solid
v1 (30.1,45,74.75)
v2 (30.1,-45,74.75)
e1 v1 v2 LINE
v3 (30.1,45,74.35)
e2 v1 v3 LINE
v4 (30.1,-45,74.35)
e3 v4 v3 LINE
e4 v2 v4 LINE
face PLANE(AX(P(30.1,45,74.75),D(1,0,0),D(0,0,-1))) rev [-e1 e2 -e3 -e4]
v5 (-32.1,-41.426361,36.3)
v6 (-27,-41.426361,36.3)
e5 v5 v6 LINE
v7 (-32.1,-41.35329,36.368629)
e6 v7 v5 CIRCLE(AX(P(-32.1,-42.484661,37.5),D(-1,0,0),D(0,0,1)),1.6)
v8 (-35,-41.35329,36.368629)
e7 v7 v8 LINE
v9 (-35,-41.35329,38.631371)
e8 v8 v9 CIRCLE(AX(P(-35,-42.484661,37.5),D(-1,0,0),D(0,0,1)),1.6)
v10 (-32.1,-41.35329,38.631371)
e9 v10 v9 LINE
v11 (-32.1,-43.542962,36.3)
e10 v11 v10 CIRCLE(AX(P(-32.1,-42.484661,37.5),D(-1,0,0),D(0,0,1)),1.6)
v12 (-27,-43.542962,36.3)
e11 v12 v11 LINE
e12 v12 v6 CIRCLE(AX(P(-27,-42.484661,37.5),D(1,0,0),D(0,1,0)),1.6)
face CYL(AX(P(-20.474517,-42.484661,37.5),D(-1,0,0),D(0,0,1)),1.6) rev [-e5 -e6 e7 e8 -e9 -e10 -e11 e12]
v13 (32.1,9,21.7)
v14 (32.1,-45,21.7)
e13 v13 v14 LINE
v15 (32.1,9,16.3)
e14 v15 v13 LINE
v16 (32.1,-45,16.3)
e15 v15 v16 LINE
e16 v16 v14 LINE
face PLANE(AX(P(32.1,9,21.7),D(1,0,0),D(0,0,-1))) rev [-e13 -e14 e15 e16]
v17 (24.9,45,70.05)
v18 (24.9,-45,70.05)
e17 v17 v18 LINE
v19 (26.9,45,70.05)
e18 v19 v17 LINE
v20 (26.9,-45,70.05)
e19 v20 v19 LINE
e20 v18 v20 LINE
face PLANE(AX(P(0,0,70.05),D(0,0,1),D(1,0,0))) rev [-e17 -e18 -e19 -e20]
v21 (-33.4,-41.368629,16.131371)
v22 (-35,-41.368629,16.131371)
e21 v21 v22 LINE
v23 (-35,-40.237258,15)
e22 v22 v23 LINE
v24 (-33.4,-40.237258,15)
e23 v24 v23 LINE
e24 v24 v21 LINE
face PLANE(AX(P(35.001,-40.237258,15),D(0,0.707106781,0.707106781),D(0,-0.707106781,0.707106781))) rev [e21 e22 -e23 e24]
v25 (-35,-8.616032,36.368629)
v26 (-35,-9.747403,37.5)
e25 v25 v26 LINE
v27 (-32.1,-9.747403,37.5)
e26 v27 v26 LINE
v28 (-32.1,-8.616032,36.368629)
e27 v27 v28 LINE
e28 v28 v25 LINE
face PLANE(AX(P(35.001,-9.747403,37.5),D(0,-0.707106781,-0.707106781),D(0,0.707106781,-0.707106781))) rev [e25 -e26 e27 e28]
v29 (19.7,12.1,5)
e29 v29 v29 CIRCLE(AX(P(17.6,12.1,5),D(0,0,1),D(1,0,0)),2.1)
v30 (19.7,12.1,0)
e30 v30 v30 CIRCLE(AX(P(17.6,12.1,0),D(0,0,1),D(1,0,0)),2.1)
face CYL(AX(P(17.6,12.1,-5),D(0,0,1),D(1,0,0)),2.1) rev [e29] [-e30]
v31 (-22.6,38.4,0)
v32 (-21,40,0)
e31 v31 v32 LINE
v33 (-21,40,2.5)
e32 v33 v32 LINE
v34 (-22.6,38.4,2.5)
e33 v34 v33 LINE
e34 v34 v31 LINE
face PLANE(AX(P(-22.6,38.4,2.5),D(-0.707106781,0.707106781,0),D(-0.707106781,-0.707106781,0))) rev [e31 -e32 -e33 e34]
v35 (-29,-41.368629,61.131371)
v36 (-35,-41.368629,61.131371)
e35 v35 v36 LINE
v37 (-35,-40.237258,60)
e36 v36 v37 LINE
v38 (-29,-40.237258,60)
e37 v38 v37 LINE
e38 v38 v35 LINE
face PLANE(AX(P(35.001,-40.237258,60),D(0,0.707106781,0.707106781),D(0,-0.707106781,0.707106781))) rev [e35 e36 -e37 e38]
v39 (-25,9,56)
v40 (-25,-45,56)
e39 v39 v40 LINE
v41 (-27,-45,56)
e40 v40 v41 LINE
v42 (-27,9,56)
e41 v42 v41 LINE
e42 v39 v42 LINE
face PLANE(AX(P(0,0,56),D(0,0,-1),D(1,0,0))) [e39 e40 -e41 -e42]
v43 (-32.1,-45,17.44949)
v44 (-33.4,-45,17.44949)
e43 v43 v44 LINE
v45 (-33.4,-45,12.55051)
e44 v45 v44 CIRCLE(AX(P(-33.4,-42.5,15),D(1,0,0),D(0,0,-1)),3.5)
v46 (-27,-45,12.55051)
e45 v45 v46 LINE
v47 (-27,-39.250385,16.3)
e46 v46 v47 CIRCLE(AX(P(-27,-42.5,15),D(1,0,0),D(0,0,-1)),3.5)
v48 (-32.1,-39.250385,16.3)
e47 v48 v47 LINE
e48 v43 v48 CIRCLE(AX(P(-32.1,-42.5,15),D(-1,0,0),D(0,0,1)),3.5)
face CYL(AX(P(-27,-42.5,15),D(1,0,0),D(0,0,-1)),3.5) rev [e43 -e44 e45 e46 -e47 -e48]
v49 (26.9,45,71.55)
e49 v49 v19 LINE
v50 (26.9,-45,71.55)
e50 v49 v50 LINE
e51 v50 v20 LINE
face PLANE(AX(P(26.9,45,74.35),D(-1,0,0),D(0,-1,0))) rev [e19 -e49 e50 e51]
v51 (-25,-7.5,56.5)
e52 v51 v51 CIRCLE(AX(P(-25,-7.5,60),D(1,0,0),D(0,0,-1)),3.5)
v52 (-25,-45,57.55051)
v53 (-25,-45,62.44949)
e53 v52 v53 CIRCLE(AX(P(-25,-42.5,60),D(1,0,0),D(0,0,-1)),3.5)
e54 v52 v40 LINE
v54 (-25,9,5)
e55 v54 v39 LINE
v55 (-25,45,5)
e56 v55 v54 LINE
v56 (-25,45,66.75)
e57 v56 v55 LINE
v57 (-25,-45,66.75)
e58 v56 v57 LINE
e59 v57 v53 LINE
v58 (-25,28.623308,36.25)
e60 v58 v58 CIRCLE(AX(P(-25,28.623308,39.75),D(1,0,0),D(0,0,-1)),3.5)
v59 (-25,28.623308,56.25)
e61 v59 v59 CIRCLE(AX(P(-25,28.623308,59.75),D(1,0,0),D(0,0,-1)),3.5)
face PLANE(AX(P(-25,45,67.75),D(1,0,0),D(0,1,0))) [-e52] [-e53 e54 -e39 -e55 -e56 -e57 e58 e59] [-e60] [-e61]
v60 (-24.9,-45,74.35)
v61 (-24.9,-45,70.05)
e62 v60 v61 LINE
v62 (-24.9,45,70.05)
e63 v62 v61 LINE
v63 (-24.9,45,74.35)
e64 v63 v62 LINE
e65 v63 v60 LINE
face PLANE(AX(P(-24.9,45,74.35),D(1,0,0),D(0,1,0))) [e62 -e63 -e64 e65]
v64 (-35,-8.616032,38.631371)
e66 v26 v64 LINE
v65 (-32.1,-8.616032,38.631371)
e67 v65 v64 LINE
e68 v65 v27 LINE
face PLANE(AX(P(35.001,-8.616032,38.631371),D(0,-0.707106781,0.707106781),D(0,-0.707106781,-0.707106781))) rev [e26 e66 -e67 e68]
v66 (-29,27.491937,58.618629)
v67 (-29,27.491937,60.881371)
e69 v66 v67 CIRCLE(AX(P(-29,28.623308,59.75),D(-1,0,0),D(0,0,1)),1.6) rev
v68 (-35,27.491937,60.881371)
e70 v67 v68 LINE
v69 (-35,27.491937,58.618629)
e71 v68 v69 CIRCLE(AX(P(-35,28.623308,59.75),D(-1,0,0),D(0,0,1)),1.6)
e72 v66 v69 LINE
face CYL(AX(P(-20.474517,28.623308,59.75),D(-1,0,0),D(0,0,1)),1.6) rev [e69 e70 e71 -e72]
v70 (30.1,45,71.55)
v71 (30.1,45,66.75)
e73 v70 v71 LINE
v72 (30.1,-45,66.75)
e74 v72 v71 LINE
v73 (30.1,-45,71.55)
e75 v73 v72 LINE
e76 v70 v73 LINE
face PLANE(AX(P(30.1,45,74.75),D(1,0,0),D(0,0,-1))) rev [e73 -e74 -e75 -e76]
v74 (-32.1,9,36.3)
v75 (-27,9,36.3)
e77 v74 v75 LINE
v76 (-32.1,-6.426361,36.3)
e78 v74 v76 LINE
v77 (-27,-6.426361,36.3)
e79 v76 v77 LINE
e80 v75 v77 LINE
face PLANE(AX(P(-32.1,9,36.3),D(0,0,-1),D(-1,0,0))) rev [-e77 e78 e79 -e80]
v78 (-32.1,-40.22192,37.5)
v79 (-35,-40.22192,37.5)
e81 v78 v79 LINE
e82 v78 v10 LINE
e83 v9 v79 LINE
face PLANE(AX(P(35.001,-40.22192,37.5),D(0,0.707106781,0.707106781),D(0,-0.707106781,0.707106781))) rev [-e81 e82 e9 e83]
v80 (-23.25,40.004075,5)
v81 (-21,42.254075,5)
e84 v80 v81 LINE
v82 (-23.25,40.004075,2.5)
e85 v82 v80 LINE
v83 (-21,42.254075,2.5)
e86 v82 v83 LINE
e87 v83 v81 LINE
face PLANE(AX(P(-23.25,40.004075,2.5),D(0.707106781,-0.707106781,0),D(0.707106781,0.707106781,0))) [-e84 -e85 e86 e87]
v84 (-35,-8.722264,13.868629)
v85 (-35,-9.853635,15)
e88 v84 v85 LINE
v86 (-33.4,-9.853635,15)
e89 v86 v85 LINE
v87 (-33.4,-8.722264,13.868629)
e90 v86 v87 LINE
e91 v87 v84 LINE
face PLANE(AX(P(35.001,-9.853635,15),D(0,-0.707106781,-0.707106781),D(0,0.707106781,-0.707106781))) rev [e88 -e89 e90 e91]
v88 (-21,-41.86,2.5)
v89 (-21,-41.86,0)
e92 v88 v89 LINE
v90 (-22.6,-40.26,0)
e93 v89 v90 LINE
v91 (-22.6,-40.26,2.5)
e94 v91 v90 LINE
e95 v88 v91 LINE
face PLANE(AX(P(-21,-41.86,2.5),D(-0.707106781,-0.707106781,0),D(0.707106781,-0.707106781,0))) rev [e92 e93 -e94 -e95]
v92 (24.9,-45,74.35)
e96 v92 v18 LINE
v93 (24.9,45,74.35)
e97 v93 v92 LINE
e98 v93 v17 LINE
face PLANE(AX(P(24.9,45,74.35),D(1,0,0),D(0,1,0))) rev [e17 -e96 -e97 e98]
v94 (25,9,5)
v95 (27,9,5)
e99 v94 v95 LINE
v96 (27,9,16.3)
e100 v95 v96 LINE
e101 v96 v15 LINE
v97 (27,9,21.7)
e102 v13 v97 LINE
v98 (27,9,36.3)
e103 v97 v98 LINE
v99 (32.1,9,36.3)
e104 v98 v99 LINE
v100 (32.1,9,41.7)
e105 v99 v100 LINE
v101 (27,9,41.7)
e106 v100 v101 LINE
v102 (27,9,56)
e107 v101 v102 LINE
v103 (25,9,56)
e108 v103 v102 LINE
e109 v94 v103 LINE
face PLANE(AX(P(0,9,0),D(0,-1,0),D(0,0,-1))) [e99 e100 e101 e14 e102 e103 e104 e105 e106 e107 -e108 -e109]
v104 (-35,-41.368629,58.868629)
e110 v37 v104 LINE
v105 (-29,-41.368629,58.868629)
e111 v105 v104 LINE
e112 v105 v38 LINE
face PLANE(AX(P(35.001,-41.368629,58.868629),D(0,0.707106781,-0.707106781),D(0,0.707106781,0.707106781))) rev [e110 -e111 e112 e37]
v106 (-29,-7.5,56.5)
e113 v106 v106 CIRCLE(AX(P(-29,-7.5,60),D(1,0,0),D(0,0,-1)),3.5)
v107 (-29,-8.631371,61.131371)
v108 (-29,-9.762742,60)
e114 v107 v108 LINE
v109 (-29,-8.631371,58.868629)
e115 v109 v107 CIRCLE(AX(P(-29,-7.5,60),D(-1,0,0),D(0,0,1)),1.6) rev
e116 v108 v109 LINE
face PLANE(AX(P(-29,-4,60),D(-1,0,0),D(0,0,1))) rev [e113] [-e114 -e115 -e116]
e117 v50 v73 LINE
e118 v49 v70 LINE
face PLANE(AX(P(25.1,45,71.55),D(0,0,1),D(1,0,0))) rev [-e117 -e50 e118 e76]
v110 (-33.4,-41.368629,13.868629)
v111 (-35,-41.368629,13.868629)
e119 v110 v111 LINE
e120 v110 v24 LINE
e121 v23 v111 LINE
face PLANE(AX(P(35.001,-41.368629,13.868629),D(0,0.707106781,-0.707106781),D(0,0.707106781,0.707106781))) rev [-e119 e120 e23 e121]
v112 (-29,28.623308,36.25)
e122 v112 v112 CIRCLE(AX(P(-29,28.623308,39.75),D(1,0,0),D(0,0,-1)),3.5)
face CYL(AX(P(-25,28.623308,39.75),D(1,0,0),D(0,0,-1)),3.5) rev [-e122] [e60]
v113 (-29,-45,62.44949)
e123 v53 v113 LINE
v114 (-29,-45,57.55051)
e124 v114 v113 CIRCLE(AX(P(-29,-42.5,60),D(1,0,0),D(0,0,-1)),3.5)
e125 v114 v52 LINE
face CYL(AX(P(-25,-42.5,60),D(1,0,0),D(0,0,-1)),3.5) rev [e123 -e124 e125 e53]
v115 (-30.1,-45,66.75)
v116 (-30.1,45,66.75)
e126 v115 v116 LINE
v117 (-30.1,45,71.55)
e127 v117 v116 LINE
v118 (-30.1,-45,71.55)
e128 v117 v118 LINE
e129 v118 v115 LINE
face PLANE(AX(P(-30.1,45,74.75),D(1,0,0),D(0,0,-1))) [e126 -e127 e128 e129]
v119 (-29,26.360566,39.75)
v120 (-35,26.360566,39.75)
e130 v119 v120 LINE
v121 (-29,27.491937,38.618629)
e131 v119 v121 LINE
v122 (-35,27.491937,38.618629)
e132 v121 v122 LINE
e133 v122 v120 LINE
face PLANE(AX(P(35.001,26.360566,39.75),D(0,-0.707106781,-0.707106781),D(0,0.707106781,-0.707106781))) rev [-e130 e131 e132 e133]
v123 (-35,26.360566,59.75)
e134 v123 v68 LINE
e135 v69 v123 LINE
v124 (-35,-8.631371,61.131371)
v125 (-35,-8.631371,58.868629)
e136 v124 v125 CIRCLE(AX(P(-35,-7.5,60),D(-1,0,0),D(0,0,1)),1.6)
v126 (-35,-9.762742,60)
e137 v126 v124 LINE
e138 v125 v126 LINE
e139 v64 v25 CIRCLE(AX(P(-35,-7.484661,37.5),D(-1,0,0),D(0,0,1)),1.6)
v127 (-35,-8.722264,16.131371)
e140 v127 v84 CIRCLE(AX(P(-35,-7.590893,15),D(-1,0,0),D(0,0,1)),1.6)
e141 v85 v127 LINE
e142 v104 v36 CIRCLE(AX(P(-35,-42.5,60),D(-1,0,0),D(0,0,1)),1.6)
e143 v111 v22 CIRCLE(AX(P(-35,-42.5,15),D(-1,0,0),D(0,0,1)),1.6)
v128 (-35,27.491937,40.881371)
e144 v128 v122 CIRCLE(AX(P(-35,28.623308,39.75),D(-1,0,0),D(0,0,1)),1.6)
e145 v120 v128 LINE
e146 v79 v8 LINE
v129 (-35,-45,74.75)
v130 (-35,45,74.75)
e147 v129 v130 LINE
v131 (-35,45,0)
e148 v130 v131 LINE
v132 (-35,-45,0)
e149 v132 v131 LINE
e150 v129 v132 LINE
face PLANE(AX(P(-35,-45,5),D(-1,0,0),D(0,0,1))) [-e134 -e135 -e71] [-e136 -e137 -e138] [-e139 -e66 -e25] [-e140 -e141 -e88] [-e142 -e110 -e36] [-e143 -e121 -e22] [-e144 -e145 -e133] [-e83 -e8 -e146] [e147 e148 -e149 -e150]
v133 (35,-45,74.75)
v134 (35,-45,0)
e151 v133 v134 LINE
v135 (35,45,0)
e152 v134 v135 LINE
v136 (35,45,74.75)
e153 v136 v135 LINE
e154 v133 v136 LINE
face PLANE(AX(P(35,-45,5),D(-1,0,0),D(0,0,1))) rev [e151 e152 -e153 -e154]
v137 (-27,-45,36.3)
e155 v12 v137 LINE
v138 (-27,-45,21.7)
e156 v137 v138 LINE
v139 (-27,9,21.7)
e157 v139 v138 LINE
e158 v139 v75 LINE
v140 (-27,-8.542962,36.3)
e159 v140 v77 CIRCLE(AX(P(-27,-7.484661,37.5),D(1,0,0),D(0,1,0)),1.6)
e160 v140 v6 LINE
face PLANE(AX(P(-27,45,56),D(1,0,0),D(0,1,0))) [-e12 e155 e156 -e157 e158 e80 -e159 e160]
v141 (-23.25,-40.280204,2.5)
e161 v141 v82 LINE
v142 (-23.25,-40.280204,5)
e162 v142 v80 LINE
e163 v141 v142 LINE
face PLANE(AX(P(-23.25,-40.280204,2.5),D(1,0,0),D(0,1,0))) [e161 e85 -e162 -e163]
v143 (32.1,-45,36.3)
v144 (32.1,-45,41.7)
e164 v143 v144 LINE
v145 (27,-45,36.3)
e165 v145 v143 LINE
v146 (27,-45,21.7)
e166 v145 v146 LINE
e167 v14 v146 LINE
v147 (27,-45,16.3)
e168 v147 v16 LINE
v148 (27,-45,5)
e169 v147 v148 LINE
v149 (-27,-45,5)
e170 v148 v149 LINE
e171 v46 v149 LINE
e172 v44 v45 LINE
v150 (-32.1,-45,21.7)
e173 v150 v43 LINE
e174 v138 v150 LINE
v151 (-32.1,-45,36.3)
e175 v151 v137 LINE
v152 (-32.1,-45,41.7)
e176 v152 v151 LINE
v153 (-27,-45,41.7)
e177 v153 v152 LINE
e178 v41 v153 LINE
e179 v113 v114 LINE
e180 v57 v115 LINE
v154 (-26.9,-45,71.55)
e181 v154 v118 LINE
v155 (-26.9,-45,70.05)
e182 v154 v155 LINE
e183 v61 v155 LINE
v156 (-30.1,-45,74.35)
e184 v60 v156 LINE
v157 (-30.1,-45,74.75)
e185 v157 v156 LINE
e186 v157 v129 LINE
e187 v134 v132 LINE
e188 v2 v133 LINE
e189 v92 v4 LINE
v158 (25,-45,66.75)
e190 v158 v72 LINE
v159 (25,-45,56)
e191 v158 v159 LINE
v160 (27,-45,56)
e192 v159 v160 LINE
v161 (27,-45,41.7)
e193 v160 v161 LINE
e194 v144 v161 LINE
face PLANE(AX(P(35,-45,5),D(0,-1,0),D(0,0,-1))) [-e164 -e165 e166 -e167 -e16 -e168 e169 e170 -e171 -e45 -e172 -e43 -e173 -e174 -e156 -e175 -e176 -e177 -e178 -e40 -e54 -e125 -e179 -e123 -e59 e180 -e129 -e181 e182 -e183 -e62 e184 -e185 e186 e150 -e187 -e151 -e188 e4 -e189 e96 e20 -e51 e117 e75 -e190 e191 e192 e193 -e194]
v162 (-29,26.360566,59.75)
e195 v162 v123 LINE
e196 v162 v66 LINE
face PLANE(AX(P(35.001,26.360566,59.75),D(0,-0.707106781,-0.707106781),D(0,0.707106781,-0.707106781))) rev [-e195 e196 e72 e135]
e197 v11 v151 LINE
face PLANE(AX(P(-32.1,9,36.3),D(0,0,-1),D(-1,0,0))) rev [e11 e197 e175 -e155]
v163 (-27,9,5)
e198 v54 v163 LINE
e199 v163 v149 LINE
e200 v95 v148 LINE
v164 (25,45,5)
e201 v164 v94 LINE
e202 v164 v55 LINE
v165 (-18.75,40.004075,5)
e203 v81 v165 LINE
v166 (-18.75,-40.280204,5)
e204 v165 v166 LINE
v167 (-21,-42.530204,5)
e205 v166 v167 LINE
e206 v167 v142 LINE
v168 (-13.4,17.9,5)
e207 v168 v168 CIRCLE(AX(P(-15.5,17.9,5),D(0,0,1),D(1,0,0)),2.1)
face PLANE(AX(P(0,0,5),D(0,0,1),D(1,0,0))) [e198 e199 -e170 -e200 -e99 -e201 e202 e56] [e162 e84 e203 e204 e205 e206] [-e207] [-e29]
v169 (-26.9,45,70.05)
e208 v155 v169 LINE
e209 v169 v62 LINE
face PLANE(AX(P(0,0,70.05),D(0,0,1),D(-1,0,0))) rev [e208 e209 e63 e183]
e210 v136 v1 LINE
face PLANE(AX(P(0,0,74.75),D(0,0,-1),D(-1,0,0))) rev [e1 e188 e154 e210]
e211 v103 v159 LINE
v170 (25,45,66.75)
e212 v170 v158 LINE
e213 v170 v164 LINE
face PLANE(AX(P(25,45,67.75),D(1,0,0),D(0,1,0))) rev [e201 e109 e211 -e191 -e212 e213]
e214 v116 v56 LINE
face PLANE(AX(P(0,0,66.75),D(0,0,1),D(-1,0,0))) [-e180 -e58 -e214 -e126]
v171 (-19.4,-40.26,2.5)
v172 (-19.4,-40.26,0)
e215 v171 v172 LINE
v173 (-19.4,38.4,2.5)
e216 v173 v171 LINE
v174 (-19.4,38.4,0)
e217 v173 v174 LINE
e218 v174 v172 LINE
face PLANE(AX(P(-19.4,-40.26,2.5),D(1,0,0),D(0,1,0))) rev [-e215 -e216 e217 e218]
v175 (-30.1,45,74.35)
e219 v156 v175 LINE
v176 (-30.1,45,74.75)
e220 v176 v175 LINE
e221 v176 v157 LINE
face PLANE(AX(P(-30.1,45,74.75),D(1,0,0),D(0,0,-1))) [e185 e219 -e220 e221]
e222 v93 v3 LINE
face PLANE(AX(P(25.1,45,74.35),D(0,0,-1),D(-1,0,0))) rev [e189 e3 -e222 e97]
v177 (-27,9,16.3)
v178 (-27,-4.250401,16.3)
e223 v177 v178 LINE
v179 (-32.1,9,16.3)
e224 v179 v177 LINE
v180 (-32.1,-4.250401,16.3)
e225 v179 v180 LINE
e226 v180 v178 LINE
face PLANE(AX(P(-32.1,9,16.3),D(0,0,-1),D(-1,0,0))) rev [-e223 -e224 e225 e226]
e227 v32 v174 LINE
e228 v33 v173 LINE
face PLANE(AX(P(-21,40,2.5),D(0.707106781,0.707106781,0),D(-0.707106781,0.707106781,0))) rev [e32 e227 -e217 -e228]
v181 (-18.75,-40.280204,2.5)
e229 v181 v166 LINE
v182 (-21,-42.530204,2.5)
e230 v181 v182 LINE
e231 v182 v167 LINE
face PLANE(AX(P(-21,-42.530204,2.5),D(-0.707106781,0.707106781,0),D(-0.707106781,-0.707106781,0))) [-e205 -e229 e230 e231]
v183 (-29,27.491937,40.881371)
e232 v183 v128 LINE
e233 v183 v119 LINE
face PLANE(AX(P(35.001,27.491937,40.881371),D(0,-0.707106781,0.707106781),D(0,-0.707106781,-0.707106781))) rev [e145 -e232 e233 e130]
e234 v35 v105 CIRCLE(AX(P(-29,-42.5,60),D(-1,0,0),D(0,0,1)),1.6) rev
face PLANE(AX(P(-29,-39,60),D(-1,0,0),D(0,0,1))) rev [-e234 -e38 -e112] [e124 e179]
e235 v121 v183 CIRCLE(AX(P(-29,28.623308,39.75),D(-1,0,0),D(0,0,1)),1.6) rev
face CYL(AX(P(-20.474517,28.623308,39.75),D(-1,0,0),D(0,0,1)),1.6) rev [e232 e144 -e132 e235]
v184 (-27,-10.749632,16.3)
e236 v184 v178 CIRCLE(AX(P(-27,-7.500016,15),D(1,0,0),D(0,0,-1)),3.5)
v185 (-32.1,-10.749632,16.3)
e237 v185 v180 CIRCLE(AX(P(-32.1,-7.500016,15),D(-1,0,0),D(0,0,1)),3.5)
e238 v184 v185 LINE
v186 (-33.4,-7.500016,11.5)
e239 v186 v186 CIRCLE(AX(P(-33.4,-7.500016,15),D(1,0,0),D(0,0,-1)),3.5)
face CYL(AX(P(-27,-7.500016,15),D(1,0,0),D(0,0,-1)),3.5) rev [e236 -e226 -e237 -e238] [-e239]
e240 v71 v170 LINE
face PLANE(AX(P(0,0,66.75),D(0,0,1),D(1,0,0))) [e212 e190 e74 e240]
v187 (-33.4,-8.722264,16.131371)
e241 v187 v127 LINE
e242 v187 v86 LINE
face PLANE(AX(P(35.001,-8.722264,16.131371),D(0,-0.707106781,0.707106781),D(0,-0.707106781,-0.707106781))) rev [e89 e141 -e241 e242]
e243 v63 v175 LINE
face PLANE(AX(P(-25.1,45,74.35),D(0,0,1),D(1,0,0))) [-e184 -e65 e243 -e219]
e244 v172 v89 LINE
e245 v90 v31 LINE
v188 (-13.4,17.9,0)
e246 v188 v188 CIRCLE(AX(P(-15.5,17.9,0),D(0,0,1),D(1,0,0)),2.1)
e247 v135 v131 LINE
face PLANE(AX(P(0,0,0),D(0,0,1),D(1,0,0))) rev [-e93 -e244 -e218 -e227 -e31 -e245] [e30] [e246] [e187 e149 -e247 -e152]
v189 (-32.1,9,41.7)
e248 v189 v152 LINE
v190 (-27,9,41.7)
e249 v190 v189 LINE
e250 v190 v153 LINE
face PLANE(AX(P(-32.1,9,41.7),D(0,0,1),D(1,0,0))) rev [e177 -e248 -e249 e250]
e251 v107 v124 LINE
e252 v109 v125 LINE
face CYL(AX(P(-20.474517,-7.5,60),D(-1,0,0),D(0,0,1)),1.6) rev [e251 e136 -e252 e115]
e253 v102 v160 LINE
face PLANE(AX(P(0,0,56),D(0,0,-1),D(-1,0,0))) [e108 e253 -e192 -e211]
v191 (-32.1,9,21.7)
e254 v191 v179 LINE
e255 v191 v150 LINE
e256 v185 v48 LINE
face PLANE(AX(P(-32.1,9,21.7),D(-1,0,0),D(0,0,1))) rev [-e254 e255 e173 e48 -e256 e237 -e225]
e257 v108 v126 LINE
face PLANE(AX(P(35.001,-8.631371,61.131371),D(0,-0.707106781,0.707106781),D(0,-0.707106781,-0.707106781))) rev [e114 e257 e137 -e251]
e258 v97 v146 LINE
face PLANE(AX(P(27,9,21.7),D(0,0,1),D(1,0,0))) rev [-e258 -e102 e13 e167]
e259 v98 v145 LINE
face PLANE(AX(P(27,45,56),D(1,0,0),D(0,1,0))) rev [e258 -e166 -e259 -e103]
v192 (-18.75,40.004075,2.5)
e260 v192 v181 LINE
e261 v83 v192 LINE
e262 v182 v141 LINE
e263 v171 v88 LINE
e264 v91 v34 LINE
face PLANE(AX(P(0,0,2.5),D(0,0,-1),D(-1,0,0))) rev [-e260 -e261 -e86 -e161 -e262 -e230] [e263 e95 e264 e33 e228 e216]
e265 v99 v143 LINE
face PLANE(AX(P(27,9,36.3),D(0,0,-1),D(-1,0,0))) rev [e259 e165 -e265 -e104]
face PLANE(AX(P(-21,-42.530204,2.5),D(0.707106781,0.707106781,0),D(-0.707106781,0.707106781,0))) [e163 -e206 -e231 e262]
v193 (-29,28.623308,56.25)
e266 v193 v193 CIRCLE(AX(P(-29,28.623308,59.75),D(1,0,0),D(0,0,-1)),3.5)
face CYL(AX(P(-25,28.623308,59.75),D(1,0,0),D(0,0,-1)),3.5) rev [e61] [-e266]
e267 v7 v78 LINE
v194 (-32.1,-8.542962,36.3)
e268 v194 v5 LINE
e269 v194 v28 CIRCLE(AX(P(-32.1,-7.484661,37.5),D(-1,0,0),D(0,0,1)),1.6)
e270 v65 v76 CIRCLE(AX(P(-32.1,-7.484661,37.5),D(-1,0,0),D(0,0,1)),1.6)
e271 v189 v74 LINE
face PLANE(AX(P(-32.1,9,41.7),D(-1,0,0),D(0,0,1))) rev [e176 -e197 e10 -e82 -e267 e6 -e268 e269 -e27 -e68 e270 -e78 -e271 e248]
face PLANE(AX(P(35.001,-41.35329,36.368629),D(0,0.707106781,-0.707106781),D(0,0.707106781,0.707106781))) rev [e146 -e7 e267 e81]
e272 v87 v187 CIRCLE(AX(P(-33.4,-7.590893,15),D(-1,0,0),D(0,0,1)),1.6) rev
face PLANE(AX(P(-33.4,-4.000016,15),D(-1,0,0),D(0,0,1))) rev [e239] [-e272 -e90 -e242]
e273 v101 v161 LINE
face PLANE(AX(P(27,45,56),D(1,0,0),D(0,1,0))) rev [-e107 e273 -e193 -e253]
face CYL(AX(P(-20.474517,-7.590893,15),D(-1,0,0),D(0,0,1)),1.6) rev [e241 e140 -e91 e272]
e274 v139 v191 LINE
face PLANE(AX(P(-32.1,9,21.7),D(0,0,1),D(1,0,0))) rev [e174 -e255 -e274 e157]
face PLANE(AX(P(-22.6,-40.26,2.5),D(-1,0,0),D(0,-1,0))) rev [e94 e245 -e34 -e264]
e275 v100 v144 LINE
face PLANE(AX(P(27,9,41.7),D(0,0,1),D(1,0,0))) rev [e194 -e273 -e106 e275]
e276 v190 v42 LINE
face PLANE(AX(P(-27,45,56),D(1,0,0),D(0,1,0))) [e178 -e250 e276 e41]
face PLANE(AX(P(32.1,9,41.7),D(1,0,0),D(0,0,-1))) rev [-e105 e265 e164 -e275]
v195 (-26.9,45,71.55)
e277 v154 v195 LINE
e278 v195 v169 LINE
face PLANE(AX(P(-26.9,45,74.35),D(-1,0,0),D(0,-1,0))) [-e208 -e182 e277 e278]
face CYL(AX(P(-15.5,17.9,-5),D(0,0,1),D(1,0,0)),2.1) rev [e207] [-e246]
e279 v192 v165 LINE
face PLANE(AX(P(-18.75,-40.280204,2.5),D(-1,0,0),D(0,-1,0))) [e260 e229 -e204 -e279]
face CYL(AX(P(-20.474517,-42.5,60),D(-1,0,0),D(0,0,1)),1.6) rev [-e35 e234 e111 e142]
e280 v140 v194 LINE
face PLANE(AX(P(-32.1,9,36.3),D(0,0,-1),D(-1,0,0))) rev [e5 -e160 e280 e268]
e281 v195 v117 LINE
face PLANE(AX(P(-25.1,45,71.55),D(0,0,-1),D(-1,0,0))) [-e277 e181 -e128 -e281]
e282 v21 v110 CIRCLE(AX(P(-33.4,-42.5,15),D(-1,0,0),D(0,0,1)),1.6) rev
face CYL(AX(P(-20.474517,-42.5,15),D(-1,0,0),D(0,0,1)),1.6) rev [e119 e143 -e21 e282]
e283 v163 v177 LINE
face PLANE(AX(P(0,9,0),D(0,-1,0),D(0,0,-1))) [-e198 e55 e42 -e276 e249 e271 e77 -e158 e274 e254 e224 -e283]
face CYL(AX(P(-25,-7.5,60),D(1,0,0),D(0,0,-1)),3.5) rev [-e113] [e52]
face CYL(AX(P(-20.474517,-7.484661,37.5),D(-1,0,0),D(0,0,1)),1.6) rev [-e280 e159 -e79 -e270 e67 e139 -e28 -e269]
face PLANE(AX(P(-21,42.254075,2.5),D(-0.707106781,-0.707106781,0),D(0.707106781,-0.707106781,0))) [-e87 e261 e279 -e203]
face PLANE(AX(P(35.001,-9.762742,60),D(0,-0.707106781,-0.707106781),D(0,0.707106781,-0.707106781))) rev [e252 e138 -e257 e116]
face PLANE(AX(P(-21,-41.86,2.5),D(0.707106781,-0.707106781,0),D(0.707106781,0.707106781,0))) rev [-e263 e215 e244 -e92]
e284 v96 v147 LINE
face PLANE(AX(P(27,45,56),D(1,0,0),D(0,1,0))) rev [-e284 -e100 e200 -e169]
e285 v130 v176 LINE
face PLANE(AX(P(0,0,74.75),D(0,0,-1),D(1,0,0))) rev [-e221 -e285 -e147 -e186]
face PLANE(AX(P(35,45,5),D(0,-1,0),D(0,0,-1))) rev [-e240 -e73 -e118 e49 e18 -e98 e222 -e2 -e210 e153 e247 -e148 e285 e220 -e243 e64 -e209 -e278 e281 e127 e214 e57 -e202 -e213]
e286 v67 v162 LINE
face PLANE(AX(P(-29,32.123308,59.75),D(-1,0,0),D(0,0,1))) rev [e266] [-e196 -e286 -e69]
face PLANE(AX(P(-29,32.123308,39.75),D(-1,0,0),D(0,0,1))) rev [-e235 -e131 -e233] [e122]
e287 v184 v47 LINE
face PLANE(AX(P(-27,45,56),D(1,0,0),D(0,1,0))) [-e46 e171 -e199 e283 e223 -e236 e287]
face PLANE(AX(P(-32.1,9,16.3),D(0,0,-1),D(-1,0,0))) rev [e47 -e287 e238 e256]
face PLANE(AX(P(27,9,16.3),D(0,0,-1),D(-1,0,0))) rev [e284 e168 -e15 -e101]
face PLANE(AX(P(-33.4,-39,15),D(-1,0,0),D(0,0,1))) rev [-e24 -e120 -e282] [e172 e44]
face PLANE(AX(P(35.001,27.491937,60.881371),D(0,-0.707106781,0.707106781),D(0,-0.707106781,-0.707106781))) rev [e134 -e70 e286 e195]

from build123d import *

# Parameters (mm, degrees)
SKETCH1_W                 = 90
SKETCH1_H                 = 70
BOSS_EXTRUDE1_DEPTH       = 5
SKETCH2_W                 = 8
SKETCH2_H                 = 90
BOSS_EXTRUDE2_DEPTH       = 51
SKETCH3_W                 = 5.1
SKETCH3_H                 = 5.4
CUT_EXTRUDE1_DEPTH        = 54
SKETCH14_W                = 10
SKETCH14_H                = 90
BOSS_EXTRUDE6_DEPTH       = 11.75
SKETCH15_W                = 4.9
SKETCH15_H                = 90
BOSS_EXTRUDE7_DEPTH       = 7
SKETCH17_W                = 90
SKETCH17_H                = 2.8
BOSS_EXTRUDE8_DEPTH       = 5
SKETCH16_W                = 5.1
SKETCH16_H                = 90
CUT_EXTRUDE3_DEPTH        = 1
BOSS_EXTRUDE9_START       = -1.5
SKETCH18_W                = 2
SKETCH18_H                = 90
BOSS_EXTRUDE9_DEPTH       = 4.3
SKETCH43_W                = 36
SKETCH43_H                = 51
BOSS_EXTRUDE10_DEPTH      = 2
CUT_EXTRUDE4_START        = -10
SKETCH44_R                = 1.6
CUT_EXTRUDE4_DEPTH        = 10
SKETCH45_R                = 1.6
CUT_EXTRUDE5_DEPTH        = 95.008310803
CUT_EXTRUDE6_DEPTH        = 2.5
CUT_EXTRUDE7_DEPTH        = 2.5
ADVANCEDHOLE4_START       = -33.4
ADVANCEDHOLE4_OUTLINE_R   = 1.6
ADVANCEDHOLE4_OUTLINE_R_2 = 3.5
ADVANCEDHOLE4_DEPTH       = 6.4
ADVANCEDHOLE5_START       = -29
ADVANCEDHOLE5_OUTLINE_R   = 1.6
ADVANCEDHOLE5_OUTLINE_R_2 = 3.5
ADVANCEDHOLE5_DEPTH       = 4
CUT_EXTRUDE8_REACH        = 113.86
SKETCH65_R                = 2.1
CUT_EXTRUDE9_DEPTH        = 10


# Read off the part's stored shape, not the designer's step: AdvancedHole4, AdvancedHole5
with BuildPart() as part:
    # Sketch1 → Boss-Extrude1 (new body)
    with BuildSketch(Plane(origin=(0, 0, 0), x_dir=(0, 1, 0), z_dir=(0, 0, 1))):
        Rectangle(SKETCH1_W, SKETCH1_H)
    extrude(amount=BOSS_EXTRUDE1_DEPTH)

    # Sketch2 → Boss-Extrude2 (add)
    with BuildSketch(Plane.XY.offset(5)):
        with Locations((-31, 0)):
            Rectangle(SKETCH2_W, SKETCH2_H)
        with Locations((31, 0)):
            Rectangle(SKETCH2_W, SKETCH2_H)
    extrude(amount=BOSS_EXTRUDE2_DEPTH)

    # Sketch3 → Cut-Extrude1 (cut)
    with BuildSketch(Plane.XZ.offset(45)):
        with Locations((-29.55, 19)):
            Rectangle(SKETCH3_W, SKETCH3_H)
        with Locations((-29.55, 39)):
            Rectangle(SKETCH3_W, SKETCH3_H)
        with Locations((29.55, 19)):
            Rectangle(SKETCH3_W, SKETCH3_H)
        with Locations((29.55, 39)):
            Rectangle(SKETCH3_W, SKETCH3_H)
    extrude(amount=-CUT_EXTRUDE1_DEPTH, mode=Mode.SUBTRACT)

    # Sketch14 → Boss-Extrude6 (add)
    with BuildSketch(Plane.XY.offset(56)):
        with Locations((30, 0)):
            Rectangle(SKETCH14_W, SKETCH14_H)
    boss_extrude6 = extrude(amount=BOSS_EXTRUDE6_DEPTH)

    # Sketch15 → Boss-Extrude7 (add)
    with BuildSketch(Plane.XY.offset(67.75)):
        with Locations((32.55, 0)):
            Rectangle(SKETCH15_W, SKETCH15_H)
    boss_extrude7 = extrude(amount=BOSS_EXTRUDE7_DEPTH)

    # Sketch17 → Boss-Extrude8 (add)
    with BuildSketch(Plane(origin=(30.1, 0, 0), x_dir=(0, -1, 0), z_dir=(-1, 0, 0))):
        with Locations((0, 72.95)):
            Rectangle(SKETCH17_W, SKETCH17_H)
    boss_extrude8 = extrude(amount=BOSS_EXTRUDE8_DEPTH)

    # Sketch16 → Cut-Extrude3 (cut)
    with BuildSketch(Plane.XY.offset(67.75)):
        with Locations((27.55, 0)):
            Rectangle(SKETCH16_W, SKETCH16_H)
    cut_extrude3 = extrude(amount=-CUT_EXTRUDE3_DEPTH, mode=Mode.SUBTRACT)

    # Sketch18 → Boss-Extrude9 (add)
    with BuildSketch(Plane.XY.offset(71.55).offset(BOSS_EXTRUDE9_START)):
        with Locations((25.9, 0)):
            Rectangle(SKETCH18_W, SKETCH18_H)
    boss_extrude9 = extrude(amount=BOSS_EXTRUDE9_DEPTH)

    # Sketch43 → Boss-Extrude10 (add)
    with BuildSketch(Plane(origin=(27, 0, 0), x_dir=(0, -1, 0), z_dir=(-1, 0, 0))):
        with Locations((-27, 30.5)):
            Rectangle(SKETCH43_W, SKETCH43_H)
    boss_extrude10 = extrude(amount=BOSS_EXTRUDE10_DEPTH)

    # Mirror2: Boss-Extrude6, Boss-Extrude7, Boss-Extrude8, Cut-Extrude3, Boss-Extrude9, Boss-Extrude10 across plane
    add(boss_extrude6.mirror(Plane(origin=(0, 0, 0), x_dir=(0, 0, 1), z_dir=(1, 0, 0))))
    add(boss_extrude7.mirror(Plane(origin=(0, 0, 0), x_dir=(0, 0, 1), z_dir=(1, 0, 0))))
    add(boss_extrude8.mirror(Plane(origin=(0, 0, 0), x_dir=(0, 0, 1), z_dir=(1, 0, 0))))
    add(cut_extrude3.mirror(Plane(origin=(0, 0, 0), x_dir=(0, 0, 1), z_dir=(1, 0, 0))), mode=Mode.SUBTRACT)
    add(boss_extrude9.mirror(Plane(origin=(0, 0, 0), x_dir=(0, 0, 1), z_dir=(1, 0, 0))))
    add(boss_extrude10.mirror(Plane(origin=(0, 0, 0), x_dir=(0, 0, 1), z_dir=(1, 0, 0))))

    # Sketch44 → Cut-Extrude4 (cut)
    with BuildSketch(Plane(origin=(-35, 0, 0), x_dir=(0, -1, 0), z_dir=(-1, 0, 0)).offset(CUT_EXTRUDE4_START)):
        with Locations(Location((42.5, 15, 0), (0, 0, 90))):
            Circle(SKETCH44_R)
        with Locations(Location((42.484661232, 37.5, 0), (0, 0, 90))):
            Circle(SKETCH44_R)
        with Locations(Location((42.5, 60, 0), (0, 0, 90))):
            Circle(SKETCH44_R)
        with Locations(Location((7.5, 60, 0), (0, 0, 90))):
            Circle(SKETCH44_R)
        with Locations(Location((7.484661232, 37.5, 0), (0, 0, 90))):
            Circle(SKETCH44_R)
        with Locations(Location((-28.623308021, 39.75, 0), (0, 0, 90))):
            Circle(SKETCH44_R)
        with Locations(Location((-28.623308021, 59.75, 0), (0, 0, 90))):
            Circle(SKETCH44_R)
        with Locations(Location((7.590893279, 15, 0), (0, 0, 90))):
            Circle(SKETCH44_R)
    extrude(amount=CUT_EXTRUDE4_DEPTH, mode=Mode.SUBTRACT)

    # Sketch45 → Cut-Extrude5 (cut, through all)
    with BuildSketch(Plane(origin=(0, 0, 0), x_dir=(1, 0, 0), z_dir=(0, 0, -1))):
        with Locations(Location((-21, 17.516567366, 0), (0, 0, 180))):
            Circle(SKETCH45_R)
    extrude(amount=-CUT_EXTRUDE5_DEPTH, mode=Mode.SUBTRACT)

    # Sketch46 → Cut-Extrude6 (cut)
    with BuildSketch(Plane(origin=(0, 0, 5), x_dir=(1, 0, 0), z_dir=(0, 0, -1))):
        Polygon((-18.75, 40.280204311), (-18.75, -40.004074809), (-21, -42.254074809), (-23.25, -40.004074809), (-23.25, 40.280204311), (-21, 42.530204311), align=None)
    extrude(amount=CUT_EXTRUDE6_DEPTH, mode=Mode.SUBTRACT)

    # Sketch49 → Cut-Extrude7 (cut)
    with BuildSketch(Plane(origin=(0, 0, 0), x_dir=(1, 0, 0), z_dir=(0, 0, -1))):
        Polygon((-19.4, 40.26), (-19.4, -38.4), (-21, -40), (-22.6, -38.4), (-22.6, 40.26), (-21, 41.86), align=None)
    extrude(amount=-CUT_EXTRUDE7_DEPTH, mode=Mode.SUBTRACT)

    # AdvancedHole4 outline → AdvancedHole4 (cut)
    # profile 1 of 2: a face of its own
    with BuildSketch(Plane.YZ.offset(ADVANCEDHOLE4_START)):
        with BuildLine():
            Line((-45, 16.3), (-45, 12.550510257))
            ThreePointArc((-45, 12.550510257), (-39, 15), (-45, 17.449489743))
            Line((-45, 17.449489743), (-45, 16.3))
        make_face()
        with Locations((-42.5, 15)):
            Circle(ADVANCEDHOLE4_OUTLINE_R, mode=Mode.SUBTRACT)
    # profile 2 of 2: a face of its own
    with BuildSketch(Plane.YZ.offset(ADVANCEDHOLE4_START)):
        with Locations((-7.500016499, 15)):
            Circle(ADVANCEDHOLE4_OUTLINE_R_2)
        with Locations((-7.590893279, 15)):
            Circle(ADVANCEDHOLE4_OUTLINE_R, mode=Mode.SUBTRACT)
    extrude(amount=ADVANCEDHOLE4_DEPTH, mode=Mode.SUBTRACT)

    # AdvancedHole5 outline → AdvancedHole5 (cut)
    # profile 1 of 4: a face of its own
    with BuildSketch(Plane.YZ.offset(ADVANCEDHOLE5_START)):
        with BuildLine():
            Line((-45, 62.449489743), (-45, 57.550510257))
            ThreePointArc((-45, 57.550510257), (-39, 60), (-45, 62.449489743))
        make_face()
        with Locations((-42.5, 60)):
            Circle(ADVANCEDHOLE5_OUTLINE_R, mode=Mode.SUBTRACT)
    # profile 2 of 4: a face of its own
    with BuildSketch(Plane.YZ.offset(ADVANCEDHOLE5_START)):
        with Locations((28.623308021, 39.75)):
            Circle(ADVANCEDHOLE5_OUTLINE_R_2)
        with Locations((28.623308021, 39.75)):
            Circle(ADVANCEDHOLE5_OUTLINE_R, mode=Mode.SUBTRACT)
    # profile 3 of 4: a face of its own
    with BuildSketch(Plane.YZ.offset(ADVANCEDHOLE5_START)):
        with Locations((-7.5, 60)):
            Circle(ADVANCEDHOLE5_OUTLINE_R_2)
        with Locations((-7.5, 60)):
            Circle(ADVANCEDHOLE5_OUTLINE_R, mode=Mode.SUBTRACT)
    # profile 4 of 4: a face of its own
    with BuildSketch(Plane.YZ.offset(ADVANCEDHOLE5_START)):
        with Locations((28.623308021, 59.75)):
            Circle(ADVANCEDHOLE5_OUTLINE_R_2)
        with Locations((28.623308021, 59.75)):
            Circle(ADVANCEDHOLE5_OUTLINE_R, mode=Mode.SUBTRACT)
    extrude(amount=ADVANCEDHOLE5_DEPTH, mode=Mode.SUBTRACT)

    # Sketch64 → Cut-Extrude8 (cut, up to next)
    with BuildSketch(Plane(origin=(-35, 0, 0), x_dir=(0, -1, 0), z_dir=(-1, 0, 0)), mode=Mode.PRIVATE) as cut_extrude8_sk1:
        with BuildLine():
            Line((-27.491937171, 60.88137085), (-26.360566322, 59.75))
            Line((-26.360566322, 59.75), (-27.491937171, 58.61862915))
            ThreePointArc((-27.491937171, 58.61862915), (-30.223308021, 59.75), (-27.491937171, 60.88137085))
        make_face()
    cut_extrude8_tool1 = extrude(cut_extrude8_sk1.sketch, amount=-CUT_EXTRUDE8_REACH, mode=Mode.PRIVATE) & part.part
    # Sketch64 → Cut-Extrude8 (cut, up to next)
    with BuildSketch(Plane(origin=(-35, 0, 0), x_dir=(0, -1, 0), z_dir=(-1, 0, 0)), mode=Mode.PRIVATE) as cut_extrude8_sk2:
        with BuildLine():
            Line((-27.491937171, 40.88137085), (-26.360566322, 39.75))
            Line((-26.360566322, 39.75), (-27.491937171, 38.61862915))
            ThreePointArc((-27.491937171, 38.61862915), (-30.223308021, 39.75), (-27.491937171, 40.88137085))
        make_face()
    cut_extrude8_tool2 = extrude(cut_extrude8_sk2.sketch, amount=-CUT_EXTRUDE8_REACH, mode=Mode.PRIVATE) & part.part
    # Sketch64 → Cut-Extrude8 (cut, up to next)
    with BuildSketch(Plane(origin=(-35, 0, 0), x_dir=(0, -1, 0), z_dir=(-1, 0, 0)), mode=Mode.PRIVATE) as cut_extrude8_sk3:
        with BuildLine():
            Line((8.722264129, 16.13137085), (9.853634979, 15))
            Line((9.853634979, 15), (8.722264129, 13.86862915))
            ThreePointArc((8.722264129, 13.86862915), (5.990893279, 15), (8.722264129, 16.13137085))
        make_face()
    cut_extrude8_tool3 = extrude(cut_extrude8_sk3.sketch, amount=-CUT_EXTRUDE8_REACH, mode=Mode.PRIVATE) & part.part
    # Sketch64 → Cut-Extrude8 (cut, up to next)
    with BuildSketch(Plane(origin=(-35, 0, 0), x_dir=(0, -1, 0), z_dir=(-1, 0, 0)), mode=Mode.PRIVATE) as cut_extrude8_sk4:
        with BuildLine():
            Line((8.616032082, 38.63137085), (9.747402932, 37.5))
            Line((9.747402932, 37.5), (8.616032082, 36.36862915))
            ThreePointArc((8.616032082, 36.36862915), (5.884661232, 37.5), (8.616032082, 38.63137085))
        make_face()
    cut_extrude8_tool4 = extrude(cut_extrude8_sk4.sketch, amount=-CUT_EXTRUDE8_REACH, mode=Mode.PRIVATE) & part.part
    # Sketch64 → Cut-Extrude8 (cut, up to next)
    with BuildSketch(Plane(origin=(-35, 0, 0), x_dir=(0, -1, 0), z_dir=(-1, 0, 0)), mode=Mode.PRIVATE) as cut_extrude8_sk5:
        with BuildLine():
            Line((8.63137085, 61.13137085), (9.7627417, 60))
            Line((9.7627417, 60), (8.63137085, 58.86862915))
            ThreePointArc((8.63137085, 58.86862915), (5.9, 60), (8.63137085, 61.13137085))
        make_face()
    cut_extrude8_tool5 = extrude(cut_extrude8_sk5.sketch, amount=-CUT_EXTRUDE8_REACH, mode=Mode.PRIVATE) & part.part
    # Sketch64 → Cut-Extrude8 (cut, up to next)
    with BuildSketch(Plane(origin=(-35, 0, 0), x_dir=(0, -1, 0), z_dir=(-1, 0, 0)), mode=Mode.PRIVATE) as cut_extrude8_sk6:
        with BuildLine():
            Line((41.36862915, 58.86862915), (40.2372583, 60))
            Line((40.2372583, 60), (41.36862915, 61.13137085))
            ThreePointArc((41.36862915, 61.13137085), (44.1, 60), (41.36862915, 58.86862915))
        make_face()
    cut_extrude8_tool6 = extrude(cut_extrude8_sk6.sketch, amount=-CUT_EXTRUDE8_REACH, mode=Mode.PRIVATE) & part.part
    # Sketch64 → Cut-Extrude8 (cut, up to next)
    with BuildSketch(Plane(origin=(-35, 0, 0), x_dir=(0, -1, 0), z_dir=(-1, 0, 0)), mode=Mode.PRIVATE) as cut_extrude8_sk7:
        with BuildLine():
            Line((41.353290382, 36.36862915), (40.221919532, 37.5))
            Line((40.221919532, 37.5), (41.353290382, 38.63137085))
            ThreePointArc((41.353290382, 38.63137085), (44.084661232, 37.5), (41.353290382, 36.36862915))
        make_face()
    cut_extrude8_tool7 = extrude(cut_extrude8_sk7.sketch, amount=-CUT_EXTRUDE8_REACH, mode=Mode.PRIVATE) & part.part
    # Sketch64 → Cut-Extrude8 (cut, up to next)
    with BuildSketch(Plane(origin=(-35, 0, 0), x_dir=(0, -1, 0), z_dir=(-1, 0, 0)), mode=Mode.PRIVATE) as cut_extrude8_sk8:
        with BuildLine():
            Line((41.36862915, 13.86862915), (40.2372583, 15))
            Line((40.2372583, 15), (41.36862915, 16.13137085))
            ThreePointArc((41.36862915, 16.13137085), (44.1, 15), (41.36862915, 13.86862915))
        make_face()
    cut_extrude8_tool8 = extrude(cut_extrude8_sk8.sketch, amount=-CUT_EXTRUDE8_REACH, mode=Mode.PRIVATE) & part.part
    add(cut_extrude8_tool1.solids().sort_by_distance((-35, 28.510942, 59.75))[0], mode=Mode.SUBTRACT)
    add(cut_extrude8_tool2.solids().sort_by_distance((-35, 28.510942, 39.75))[0], mode=Mode.SUBTRACT)
    add(cut_extrude8_tool3.solids().sort_by_distance((-35, -7.70326, 15))[0], mode=Mode.SUBTRACT)
    add(cut_extrude8_tool4.solids().sort_by_distance((-35, -7.597028, 37.5))[0], mode=Mode.SUBTRACT)
    add(cut_extrude8_tool5.solids().sort_by_distance((-35, -7.612366, 60))[0], mode=Mode.SUBTRACT)
    add(cut_extrude8_tool6.solids().sort_by_distance((-35, -42.387634, 60))[0], mode=Mode.SUBTRACT)
    add(cut_extrude8_tool7.solids().sort_by_distance((-35, -42.372295, 37.5))[0], mode=Mode.SUBTRACT)
    add(cut_extrude8_tool8.solids().sort_by_distance((-35, -42.387634, 15))[0], mode=Mode.SUBTRACT)

    # Sketch65 → Cut-Extrude9 (cut)
    with BuildSketch(Plane.XY.offset(5)):
        with Locations((17.6, 12.1)):
            Circle(SKETCH65_R)
        with Locations((-15.5, 17.9)):
            Circle(SKETCH65_R)
    extrude(amount=-CUT_EXTRUDE9_DEPTH, mode=Mode.SUBTRACT)


solid = part.part
